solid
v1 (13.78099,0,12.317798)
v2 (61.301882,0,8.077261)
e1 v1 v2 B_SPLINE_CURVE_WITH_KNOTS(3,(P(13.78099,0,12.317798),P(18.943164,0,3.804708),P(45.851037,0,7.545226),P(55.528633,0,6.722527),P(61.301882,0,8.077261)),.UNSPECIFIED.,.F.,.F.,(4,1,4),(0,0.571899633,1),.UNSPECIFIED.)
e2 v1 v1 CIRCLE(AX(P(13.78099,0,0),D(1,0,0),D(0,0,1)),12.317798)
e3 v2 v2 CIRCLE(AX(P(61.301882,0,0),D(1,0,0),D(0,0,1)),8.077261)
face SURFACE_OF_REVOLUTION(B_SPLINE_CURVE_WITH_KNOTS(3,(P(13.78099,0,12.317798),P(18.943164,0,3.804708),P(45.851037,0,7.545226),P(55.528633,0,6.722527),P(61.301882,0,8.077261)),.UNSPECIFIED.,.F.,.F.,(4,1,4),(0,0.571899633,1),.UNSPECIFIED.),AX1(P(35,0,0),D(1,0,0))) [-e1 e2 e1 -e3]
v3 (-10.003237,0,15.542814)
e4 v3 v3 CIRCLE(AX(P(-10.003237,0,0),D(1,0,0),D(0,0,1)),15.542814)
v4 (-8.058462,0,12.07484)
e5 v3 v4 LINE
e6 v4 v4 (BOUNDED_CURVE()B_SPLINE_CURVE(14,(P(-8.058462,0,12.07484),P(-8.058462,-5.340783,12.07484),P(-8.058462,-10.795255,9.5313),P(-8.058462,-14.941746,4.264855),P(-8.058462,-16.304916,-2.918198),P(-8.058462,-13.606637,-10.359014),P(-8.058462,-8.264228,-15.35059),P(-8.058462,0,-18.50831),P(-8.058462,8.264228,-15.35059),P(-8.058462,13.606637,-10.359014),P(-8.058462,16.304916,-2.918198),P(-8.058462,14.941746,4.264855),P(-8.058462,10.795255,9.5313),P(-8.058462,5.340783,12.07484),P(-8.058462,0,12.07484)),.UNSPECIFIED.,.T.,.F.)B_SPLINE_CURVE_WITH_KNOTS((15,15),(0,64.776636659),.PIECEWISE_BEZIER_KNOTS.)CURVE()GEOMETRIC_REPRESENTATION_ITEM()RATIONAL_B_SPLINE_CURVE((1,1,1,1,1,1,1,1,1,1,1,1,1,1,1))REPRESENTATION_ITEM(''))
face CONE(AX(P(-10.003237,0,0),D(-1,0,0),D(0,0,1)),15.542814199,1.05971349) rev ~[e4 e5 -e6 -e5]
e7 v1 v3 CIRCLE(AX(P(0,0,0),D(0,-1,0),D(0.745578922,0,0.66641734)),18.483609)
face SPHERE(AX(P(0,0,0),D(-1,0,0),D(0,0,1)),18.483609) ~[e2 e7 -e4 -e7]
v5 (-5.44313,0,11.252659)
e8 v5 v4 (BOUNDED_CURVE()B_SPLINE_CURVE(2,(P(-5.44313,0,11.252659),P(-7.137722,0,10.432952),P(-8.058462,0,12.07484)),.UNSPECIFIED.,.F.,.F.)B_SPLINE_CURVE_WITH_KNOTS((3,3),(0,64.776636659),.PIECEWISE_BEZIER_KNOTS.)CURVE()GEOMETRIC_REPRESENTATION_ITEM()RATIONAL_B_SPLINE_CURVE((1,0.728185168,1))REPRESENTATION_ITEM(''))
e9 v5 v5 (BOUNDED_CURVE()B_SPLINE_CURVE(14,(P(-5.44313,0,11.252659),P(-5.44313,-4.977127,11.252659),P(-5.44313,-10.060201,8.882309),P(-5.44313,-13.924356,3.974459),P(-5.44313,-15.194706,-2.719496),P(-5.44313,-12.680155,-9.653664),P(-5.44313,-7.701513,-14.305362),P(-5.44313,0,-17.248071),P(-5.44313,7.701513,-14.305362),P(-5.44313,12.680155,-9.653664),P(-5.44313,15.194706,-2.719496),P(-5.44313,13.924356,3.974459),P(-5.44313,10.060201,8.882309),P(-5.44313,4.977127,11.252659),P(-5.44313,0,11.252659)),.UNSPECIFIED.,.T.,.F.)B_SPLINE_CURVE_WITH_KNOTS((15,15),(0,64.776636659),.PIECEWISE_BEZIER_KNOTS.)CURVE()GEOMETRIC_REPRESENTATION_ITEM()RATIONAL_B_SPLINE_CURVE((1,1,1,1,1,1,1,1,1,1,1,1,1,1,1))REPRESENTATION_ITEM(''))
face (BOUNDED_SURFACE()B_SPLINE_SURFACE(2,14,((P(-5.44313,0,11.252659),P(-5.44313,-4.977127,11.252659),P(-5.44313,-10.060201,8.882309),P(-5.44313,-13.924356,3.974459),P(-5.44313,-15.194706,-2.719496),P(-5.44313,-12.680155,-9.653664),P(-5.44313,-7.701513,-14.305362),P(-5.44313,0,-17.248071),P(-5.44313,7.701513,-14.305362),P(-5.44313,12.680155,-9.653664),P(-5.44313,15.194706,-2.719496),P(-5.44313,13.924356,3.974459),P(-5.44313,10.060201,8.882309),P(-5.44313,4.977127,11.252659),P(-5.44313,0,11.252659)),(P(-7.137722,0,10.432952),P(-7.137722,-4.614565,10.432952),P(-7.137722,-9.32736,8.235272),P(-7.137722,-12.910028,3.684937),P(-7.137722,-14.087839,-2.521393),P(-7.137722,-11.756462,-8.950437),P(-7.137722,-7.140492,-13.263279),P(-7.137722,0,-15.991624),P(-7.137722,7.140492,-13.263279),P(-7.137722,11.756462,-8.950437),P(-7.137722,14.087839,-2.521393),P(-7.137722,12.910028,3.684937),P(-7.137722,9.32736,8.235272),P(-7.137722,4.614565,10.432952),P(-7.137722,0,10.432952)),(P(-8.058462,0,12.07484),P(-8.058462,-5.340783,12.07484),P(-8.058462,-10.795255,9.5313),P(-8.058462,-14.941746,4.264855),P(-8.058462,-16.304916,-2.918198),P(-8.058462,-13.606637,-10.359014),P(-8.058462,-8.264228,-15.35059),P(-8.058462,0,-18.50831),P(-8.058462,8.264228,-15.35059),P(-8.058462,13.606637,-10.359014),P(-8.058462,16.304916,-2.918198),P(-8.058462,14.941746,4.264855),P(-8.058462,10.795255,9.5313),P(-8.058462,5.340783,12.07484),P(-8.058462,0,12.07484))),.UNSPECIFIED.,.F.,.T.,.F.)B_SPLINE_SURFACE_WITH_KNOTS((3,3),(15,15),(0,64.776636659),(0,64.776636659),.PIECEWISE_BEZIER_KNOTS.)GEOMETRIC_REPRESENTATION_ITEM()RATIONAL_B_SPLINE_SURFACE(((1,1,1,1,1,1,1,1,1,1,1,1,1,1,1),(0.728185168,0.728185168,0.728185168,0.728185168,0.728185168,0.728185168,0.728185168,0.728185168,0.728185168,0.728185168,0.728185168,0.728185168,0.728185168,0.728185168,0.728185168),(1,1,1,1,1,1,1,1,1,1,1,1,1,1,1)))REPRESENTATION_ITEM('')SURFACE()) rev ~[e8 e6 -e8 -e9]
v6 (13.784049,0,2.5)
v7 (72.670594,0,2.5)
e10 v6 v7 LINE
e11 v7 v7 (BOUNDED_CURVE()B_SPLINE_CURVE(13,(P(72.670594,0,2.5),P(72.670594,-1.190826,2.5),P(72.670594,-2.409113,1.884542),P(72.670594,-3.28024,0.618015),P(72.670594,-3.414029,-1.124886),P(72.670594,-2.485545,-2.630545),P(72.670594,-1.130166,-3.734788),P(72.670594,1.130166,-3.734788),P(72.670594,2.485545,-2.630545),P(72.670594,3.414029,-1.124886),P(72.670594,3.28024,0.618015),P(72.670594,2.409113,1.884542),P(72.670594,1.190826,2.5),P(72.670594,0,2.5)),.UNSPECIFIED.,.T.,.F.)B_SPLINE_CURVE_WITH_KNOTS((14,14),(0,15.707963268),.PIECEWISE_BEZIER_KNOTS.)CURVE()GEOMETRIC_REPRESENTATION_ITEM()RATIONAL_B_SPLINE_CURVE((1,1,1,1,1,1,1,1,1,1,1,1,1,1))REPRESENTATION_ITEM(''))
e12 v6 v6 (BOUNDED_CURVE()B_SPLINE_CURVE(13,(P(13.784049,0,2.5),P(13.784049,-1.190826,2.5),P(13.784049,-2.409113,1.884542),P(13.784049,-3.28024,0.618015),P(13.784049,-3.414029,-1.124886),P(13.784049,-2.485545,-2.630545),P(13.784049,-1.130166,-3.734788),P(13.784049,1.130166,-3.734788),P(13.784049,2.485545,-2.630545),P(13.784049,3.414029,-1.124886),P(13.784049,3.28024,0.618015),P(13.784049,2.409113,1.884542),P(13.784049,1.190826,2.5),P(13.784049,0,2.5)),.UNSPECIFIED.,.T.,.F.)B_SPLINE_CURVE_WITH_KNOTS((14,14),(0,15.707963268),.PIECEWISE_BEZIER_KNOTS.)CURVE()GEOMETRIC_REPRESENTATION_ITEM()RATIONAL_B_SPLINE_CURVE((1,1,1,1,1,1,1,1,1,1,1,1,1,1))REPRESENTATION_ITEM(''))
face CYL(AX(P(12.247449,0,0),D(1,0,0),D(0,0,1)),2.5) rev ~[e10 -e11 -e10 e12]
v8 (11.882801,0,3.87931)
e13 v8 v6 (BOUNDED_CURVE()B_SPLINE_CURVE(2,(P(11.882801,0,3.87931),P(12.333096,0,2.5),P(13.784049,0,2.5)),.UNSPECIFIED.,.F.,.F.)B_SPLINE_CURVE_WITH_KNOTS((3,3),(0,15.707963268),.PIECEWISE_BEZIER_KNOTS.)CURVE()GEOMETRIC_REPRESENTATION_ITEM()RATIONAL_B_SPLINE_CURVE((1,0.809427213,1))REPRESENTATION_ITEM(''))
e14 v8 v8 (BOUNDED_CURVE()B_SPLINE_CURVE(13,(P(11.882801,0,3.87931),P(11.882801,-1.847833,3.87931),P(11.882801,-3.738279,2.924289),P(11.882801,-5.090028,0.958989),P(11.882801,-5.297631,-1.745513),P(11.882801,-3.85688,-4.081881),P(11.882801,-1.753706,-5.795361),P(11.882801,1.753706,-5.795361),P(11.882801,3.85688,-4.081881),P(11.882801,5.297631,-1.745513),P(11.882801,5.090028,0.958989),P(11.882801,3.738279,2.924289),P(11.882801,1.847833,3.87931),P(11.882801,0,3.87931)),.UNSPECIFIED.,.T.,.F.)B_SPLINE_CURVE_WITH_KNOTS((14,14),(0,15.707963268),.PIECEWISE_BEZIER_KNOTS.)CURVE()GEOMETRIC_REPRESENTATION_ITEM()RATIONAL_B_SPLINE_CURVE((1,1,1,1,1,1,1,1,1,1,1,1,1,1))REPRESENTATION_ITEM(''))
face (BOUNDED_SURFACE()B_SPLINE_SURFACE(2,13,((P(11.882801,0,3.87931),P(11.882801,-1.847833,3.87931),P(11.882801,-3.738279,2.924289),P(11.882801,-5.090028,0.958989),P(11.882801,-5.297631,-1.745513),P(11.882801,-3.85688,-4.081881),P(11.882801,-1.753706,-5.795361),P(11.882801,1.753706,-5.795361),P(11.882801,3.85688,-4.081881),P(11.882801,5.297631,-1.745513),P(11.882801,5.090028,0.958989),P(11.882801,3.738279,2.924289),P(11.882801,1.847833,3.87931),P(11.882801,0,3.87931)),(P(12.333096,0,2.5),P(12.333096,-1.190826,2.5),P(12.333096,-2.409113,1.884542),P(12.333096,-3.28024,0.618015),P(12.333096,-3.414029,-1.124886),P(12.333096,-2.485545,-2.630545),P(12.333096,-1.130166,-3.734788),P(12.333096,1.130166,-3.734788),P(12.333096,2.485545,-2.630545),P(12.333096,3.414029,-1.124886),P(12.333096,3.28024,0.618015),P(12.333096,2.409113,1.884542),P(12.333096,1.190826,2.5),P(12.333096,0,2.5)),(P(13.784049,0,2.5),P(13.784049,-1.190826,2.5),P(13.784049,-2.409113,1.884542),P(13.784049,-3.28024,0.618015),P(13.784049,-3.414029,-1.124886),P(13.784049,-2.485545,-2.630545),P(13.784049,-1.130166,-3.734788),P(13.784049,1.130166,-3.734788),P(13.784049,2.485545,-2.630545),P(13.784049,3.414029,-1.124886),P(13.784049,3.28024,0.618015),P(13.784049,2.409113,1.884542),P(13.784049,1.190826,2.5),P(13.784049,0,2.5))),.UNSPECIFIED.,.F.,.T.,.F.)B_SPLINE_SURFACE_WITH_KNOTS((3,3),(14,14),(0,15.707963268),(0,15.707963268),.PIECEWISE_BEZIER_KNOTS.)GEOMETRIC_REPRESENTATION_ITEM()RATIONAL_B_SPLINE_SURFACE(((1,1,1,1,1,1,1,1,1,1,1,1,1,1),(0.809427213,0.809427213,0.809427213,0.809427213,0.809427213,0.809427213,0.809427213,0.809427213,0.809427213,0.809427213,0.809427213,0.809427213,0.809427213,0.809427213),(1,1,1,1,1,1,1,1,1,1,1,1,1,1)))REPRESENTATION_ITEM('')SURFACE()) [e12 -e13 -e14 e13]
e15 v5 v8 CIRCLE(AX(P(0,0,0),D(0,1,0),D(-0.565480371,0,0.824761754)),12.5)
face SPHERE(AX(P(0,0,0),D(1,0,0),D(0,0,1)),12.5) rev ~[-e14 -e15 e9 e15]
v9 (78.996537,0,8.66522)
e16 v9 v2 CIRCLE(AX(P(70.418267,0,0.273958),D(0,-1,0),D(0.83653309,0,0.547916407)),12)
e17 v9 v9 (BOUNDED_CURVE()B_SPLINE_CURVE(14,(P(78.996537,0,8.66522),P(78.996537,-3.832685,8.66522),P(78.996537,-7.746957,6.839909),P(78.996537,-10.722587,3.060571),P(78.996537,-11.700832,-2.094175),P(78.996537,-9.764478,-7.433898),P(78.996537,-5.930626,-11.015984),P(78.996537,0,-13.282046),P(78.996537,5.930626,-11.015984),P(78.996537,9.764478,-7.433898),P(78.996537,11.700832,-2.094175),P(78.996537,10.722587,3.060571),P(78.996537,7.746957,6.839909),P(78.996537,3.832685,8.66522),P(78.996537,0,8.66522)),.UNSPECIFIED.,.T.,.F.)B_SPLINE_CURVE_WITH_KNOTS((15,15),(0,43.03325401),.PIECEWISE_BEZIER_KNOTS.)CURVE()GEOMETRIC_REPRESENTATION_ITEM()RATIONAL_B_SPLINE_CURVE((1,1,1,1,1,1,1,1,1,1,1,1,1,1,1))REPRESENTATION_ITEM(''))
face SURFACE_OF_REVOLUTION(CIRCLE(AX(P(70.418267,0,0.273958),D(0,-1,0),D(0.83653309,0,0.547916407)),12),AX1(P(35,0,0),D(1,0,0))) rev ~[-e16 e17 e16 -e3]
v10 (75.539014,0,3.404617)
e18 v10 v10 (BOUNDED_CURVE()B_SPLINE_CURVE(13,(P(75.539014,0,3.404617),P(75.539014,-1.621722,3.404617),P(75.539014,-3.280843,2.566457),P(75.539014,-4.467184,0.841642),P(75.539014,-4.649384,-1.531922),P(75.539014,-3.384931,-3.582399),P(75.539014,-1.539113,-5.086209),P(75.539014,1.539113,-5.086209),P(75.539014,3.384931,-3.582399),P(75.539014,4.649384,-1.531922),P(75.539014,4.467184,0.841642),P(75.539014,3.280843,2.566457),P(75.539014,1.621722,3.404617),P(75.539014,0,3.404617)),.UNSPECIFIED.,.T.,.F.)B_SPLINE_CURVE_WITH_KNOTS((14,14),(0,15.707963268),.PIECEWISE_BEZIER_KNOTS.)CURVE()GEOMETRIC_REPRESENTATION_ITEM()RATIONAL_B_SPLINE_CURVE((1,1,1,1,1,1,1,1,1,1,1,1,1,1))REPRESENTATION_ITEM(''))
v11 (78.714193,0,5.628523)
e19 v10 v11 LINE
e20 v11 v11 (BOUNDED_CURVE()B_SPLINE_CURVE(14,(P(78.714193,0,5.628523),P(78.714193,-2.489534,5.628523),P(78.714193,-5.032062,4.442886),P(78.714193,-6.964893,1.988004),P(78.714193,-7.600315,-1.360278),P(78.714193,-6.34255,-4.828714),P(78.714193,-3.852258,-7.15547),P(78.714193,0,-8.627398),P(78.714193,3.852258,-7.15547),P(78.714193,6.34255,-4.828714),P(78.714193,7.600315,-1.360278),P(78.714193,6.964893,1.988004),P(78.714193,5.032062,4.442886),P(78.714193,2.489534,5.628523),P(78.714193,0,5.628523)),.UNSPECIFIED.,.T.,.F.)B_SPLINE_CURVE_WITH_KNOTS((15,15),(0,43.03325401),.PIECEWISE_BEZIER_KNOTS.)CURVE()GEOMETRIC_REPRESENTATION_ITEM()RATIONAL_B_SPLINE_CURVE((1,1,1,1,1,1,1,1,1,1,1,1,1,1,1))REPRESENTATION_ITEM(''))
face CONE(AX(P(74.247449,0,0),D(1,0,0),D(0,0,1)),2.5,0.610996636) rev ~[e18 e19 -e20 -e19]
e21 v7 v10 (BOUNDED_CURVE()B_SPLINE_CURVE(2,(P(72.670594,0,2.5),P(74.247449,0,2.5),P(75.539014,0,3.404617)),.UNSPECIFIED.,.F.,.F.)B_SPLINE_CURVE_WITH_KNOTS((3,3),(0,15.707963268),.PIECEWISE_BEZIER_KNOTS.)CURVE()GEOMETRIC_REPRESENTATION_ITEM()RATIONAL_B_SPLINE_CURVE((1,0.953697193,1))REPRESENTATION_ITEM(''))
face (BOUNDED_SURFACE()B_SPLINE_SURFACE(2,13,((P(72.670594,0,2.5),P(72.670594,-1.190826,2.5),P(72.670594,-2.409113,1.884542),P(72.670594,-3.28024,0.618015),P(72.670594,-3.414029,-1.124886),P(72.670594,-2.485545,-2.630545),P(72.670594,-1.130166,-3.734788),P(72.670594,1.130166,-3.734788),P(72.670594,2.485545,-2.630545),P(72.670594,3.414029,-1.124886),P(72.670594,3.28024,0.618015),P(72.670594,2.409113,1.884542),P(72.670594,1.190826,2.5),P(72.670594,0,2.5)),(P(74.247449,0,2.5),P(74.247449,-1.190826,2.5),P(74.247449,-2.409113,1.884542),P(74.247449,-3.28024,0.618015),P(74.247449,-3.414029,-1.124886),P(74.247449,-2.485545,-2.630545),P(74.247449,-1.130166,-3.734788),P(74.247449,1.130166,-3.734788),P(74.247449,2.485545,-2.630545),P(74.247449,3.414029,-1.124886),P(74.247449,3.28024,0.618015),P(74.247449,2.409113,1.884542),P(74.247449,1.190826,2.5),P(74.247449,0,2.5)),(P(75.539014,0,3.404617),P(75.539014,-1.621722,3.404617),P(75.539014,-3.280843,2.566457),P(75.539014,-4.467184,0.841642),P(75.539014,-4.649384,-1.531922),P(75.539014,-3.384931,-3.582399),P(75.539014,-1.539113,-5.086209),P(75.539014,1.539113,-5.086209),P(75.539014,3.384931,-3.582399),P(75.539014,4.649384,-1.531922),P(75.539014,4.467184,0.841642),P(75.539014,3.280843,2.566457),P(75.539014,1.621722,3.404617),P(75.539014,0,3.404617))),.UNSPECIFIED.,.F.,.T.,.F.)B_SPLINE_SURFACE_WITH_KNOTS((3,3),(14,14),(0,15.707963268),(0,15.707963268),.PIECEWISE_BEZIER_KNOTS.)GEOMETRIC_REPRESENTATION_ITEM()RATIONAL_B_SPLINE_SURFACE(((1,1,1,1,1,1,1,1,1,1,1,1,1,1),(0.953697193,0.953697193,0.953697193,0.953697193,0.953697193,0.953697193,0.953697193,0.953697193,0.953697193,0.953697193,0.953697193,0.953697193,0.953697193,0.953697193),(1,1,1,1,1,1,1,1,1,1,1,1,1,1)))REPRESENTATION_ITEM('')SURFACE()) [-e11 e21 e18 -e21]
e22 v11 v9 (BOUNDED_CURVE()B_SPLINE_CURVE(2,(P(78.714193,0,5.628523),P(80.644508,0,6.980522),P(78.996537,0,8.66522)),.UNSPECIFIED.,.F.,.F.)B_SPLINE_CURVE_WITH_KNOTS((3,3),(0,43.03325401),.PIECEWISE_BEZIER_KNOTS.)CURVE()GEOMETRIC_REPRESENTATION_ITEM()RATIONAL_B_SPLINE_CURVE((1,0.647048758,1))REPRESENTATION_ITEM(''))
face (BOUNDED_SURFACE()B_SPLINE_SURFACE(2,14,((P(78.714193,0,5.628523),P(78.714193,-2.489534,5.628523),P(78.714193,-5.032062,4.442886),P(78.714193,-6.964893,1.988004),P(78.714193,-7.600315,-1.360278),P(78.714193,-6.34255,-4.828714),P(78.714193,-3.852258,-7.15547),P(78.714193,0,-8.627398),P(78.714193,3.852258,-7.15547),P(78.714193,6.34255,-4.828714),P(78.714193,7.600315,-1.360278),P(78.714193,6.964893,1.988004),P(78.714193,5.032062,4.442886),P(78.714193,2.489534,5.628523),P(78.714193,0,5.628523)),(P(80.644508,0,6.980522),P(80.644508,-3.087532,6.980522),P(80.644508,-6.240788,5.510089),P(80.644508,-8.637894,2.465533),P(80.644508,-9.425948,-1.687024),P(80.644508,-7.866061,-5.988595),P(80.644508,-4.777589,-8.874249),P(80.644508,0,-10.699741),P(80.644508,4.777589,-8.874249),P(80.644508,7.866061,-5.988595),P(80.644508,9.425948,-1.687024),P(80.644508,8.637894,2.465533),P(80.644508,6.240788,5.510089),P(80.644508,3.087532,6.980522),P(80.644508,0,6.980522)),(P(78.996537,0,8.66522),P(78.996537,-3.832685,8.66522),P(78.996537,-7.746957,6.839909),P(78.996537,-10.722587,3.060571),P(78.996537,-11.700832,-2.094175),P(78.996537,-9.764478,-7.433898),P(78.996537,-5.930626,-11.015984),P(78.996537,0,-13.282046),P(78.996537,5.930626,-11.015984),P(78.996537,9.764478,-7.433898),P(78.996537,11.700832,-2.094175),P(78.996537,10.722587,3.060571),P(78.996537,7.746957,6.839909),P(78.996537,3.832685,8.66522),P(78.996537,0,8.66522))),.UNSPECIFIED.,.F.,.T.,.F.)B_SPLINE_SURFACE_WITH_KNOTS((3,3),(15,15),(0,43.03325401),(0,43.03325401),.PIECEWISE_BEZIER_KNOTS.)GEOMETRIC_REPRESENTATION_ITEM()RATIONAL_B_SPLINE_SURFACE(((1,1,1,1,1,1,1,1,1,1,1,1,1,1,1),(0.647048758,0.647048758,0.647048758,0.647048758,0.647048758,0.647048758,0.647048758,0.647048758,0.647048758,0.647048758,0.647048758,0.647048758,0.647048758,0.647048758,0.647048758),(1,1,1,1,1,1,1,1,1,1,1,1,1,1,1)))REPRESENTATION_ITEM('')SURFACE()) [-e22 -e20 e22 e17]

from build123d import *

# Parameters (mm, degrees)
F2_R = 2
F3_R = 5


with BuildPart() as f1:
    # F0 (on Front) → F1 (revolve)
    with BuildSketch(Plane.XZ):
        with BuildLine():
            ThreePointArc((-7.0685046336, 10.3095219212), (4.6853520259, 11.5886788028), (12.2474487139, 2.5))
            Line((12.2474487139, 2.5), (74.2474487139, 2.5))
            Line((74.2474487139, 2.5), (80.4566636234, 6.848955093))
            ThreePointArc((80.4566636234, 6.848955093), (71.1861926887, 12.2493617225), (61.3018820008, 8.0772608919))
            add(Edge.make_bspline(
                [(13.7809895682, 12.3177978136), (18.9431640709, 3.8047084098), (45.8510372203, 7.5452258089), (55.5286329868, 6.7225269235), (61.3018820008, 8.0772608919)],
                knots=[0, 0, 0, 0, 0.5718996335, 1, 1, 1, 1], degree=3))
            ThreePointArc((13.7809895682, 12.3177978136), (2.4835532955, 18.3159979112), (-10.003236638, 15.5428141988))
            Line((-10.003236638, 15.5428141988), (-7.0685046336, 10.3095219212))
        make_face()
    revolve(axis=Axis((35, 0, 0), (1, 0, 0)))

    # F2
    f2_edges = [f1.edges().sort_by_distance(p)[0] for p in [
        (80.456664, 0, -6.848955),
        (-7.068505, 0, -10.309522),
        (12.247449, 0, -2.5),
    ]]
    fillet(f2_edges, radius=F2_R)

    # F3
    f3_edges = [f1.edges().sort_by_distance(p)[0] for p in [
        (74.247449, 0, -2.5),
    ]]
    fillet(f3_edges, radius=F3_R)


solid = f1.part
